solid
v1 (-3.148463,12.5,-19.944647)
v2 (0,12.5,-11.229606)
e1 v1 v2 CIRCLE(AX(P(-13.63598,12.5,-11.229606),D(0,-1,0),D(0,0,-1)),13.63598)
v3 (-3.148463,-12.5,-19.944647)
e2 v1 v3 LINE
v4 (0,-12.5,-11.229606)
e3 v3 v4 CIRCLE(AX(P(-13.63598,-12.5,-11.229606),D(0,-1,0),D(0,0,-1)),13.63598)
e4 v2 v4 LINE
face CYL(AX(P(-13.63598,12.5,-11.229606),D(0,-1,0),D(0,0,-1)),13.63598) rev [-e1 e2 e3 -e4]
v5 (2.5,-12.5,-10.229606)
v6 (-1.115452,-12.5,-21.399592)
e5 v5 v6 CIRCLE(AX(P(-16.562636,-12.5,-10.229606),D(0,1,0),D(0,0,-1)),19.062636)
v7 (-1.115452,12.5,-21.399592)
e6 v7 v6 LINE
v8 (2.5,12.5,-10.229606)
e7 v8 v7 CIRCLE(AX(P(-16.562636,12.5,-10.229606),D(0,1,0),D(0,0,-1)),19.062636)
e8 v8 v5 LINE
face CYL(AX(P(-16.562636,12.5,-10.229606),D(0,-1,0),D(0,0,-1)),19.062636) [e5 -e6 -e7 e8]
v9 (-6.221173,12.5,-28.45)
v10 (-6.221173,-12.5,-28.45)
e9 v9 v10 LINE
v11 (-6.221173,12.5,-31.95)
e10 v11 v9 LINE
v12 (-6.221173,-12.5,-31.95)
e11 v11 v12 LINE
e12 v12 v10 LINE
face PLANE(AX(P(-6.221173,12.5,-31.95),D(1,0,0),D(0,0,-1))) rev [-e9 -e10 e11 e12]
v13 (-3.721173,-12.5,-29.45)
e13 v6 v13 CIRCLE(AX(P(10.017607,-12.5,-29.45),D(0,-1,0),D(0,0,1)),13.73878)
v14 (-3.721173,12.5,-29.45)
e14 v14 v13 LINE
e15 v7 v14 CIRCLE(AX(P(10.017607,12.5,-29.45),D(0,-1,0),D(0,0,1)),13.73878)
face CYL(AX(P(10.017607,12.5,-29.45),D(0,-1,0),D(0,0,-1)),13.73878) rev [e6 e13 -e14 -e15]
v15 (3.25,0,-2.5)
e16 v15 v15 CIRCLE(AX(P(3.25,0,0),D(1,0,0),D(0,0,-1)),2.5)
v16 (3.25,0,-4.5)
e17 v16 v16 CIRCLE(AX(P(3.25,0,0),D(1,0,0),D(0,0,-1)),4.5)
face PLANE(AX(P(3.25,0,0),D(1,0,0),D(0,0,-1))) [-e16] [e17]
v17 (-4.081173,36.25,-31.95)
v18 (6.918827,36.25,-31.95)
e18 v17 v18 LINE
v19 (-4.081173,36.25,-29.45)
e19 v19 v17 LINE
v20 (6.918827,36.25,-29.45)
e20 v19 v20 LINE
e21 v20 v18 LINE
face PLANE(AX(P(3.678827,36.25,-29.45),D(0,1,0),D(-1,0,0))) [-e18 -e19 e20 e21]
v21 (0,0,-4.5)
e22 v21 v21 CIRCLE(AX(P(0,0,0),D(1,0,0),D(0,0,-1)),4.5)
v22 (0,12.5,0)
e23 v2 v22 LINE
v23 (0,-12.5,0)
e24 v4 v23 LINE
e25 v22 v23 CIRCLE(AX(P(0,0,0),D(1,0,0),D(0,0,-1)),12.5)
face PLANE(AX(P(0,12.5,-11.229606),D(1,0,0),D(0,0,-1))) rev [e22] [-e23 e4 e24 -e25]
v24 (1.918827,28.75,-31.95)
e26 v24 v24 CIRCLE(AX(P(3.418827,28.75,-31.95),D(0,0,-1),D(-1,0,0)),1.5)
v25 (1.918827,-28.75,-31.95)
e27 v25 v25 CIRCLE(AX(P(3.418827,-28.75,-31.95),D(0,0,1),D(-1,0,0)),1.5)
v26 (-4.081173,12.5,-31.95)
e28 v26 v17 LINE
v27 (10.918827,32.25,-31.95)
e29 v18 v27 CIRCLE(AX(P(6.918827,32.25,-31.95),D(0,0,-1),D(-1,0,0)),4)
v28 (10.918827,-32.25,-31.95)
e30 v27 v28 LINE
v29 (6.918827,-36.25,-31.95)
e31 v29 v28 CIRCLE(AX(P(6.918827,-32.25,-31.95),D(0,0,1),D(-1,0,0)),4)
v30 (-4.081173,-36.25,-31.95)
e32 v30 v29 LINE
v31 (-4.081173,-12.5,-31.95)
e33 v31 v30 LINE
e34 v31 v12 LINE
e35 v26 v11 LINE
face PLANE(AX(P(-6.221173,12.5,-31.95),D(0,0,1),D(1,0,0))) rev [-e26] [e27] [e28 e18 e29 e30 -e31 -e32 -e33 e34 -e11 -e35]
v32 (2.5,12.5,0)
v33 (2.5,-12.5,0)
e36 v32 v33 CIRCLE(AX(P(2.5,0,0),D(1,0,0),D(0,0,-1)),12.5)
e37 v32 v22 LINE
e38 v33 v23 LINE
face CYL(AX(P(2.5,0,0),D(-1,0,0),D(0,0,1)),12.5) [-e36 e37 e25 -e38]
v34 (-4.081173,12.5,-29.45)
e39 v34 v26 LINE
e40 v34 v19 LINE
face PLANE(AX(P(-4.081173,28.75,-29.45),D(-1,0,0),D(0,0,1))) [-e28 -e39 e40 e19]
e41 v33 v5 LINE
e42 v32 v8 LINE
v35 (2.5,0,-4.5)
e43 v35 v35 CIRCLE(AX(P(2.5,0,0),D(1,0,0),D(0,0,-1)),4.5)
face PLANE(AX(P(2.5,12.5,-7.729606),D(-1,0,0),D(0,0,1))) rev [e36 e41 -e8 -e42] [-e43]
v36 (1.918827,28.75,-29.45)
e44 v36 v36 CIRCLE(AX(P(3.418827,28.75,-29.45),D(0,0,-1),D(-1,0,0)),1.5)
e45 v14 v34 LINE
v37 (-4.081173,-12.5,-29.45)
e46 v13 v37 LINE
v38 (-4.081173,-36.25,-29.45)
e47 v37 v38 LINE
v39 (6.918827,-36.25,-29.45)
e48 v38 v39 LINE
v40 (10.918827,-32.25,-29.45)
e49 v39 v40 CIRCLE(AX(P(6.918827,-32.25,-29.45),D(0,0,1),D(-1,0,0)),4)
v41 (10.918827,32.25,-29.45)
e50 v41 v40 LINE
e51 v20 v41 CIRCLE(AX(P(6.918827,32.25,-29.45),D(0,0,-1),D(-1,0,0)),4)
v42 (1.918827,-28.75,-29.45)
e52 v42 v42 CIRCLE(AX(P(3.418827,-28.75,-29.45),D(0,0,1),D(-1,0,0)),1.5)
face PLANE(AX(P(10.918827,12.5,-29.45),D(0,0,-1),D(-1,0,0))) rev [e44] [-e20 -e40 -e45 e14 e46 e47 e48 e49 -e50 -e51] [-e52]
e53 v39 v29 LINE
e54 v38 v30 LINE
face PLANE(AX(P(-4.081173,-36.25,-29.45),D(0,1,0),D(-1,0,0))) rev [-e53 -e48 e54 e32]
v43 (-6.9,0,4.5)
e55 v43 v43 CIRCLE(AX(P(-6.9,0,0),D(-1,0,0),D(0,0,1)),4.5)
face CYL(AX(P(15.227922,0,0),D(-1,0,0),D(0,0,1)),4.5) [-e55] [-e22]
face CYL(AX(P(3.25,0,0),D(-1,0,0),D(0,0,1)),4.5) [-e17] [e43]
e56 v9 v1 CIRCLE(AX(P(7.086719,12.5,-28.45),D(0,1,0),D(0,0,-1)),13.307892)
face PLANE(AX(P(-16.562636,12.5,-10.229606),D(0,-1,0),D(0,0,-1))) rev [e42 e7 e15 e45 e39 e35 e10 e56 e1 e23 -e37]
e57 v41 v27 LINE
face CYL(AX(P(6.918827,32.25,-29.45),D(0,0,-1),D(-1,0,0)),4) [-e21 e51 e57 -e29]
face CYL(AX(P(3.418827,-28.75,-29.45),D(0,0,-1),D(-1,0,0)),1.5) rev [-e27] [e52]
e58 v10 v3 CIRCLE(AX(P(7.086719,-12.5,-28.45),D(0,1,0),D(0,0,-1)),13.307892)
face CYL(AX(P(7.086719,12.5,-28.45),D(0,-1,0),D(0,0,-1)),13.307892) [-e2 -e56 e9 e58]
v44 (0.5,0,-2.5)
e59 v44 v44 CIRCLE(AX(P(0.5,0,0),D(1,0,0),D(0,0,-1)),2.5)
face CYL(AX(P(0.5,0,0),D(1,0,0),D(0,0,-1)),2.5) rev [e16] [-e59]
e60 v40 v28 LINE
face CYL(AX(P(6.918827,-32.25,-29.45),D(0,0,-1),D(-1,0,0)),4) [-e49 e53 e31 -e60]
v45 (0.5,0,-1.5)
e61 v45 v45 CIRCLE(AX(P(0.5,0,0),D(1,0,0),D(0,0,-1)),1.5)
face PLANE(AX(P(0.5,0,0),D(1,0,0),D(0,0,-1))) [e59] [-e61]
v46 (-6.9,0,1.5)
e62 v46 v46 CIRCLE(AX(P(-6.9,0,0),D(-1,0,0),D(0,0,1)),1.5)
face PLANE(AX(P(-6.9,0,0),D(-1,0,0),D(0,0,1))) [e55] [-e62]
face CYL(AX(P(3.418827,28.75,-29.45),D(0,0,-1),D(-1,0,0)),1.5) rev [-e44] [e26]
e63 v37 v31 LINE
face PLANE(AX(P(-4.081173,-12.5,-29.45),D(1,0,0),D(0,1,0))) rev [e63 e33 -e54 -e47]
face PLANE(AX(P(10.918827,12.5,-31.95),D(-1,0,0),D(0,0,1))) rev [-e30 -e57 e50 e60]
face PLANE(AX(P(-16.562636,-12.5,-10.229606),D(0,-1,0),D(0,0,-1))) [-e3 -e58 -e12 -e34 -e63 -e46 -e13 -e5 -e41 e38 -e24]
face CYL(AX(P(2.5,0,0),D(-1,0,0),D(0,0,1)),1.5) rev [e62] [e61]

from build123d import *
from build123d.topology import SkipClean

# Parameters (mm, degrees)
SKETCH1_R                = 1.5
BOSS_EXTRUDE1_DEPTH      = 2.5
BOSS_EXTRUDE2_DEPTH      = 6.9
BOSS_EXTRUDE2_DEPTH_BACK = 2.5
SKETCH2_R                = 4.5
SKETCH2_R_2              = 1.5
SKETCH4_R                = 2.5
CUT_EXTRUDE1_DEPTH       = 2
BOSS_EXTRUDE3_START      = 0.75
SKETCH5_R                = 4.5
SKETCH5_R_2              = 2.5
BOSS_EXTRUDE3_DEPTH      = 0.75
BOSS_EXTRUDE4_DEPTH      = 2.5
CUT_EXTRUDE2_REACH       = 80.314
SKETCH7_W                = 7
SKETCH7_H                = 16.5
SKETCH7_W_2              = 16
SKETCH7_H_2              = 8
CUT_EXTRUDE3_REACH       = 82.041
SKETCH9_W                = 2.5
SKETCH9_H                = 22.388822383
BOSS_EXTRUDE5_DEPTH      = 12.5
FILLET2_R                = 1
FILLET3_R                = 4
CUT_EXTRUDE4_DEPTH       = 74.103052287
CUT_EXTRUDE4_DEPTH_BACK  = 74.103052287
SKETCH10_W               = 78.235731334
SKETCH10_H               = 6.290045588
SKETCH11_W               = 14.64
SKETCH11_H               = 2.5
BOSS_EXTRUDE6_DEPTH      = 12.5
BOSS_EXTRUDE7_DEPTH      = 2.5
SKETCH14_R               = 1.5
CUT_EXTRUDE5_DEPTH       = 2.5


with BuildPart() as part:
    # Sketch1 → Boss-Extrude1 (new body)
    with BuildSketch(Plane(origin=(0, 0, 0), x_dir=(0, 0, -1), z_dir=(1, 0, 0))):
        with BuildLine():
            Line((0, 12.5), (34.45, 12.5))
            Line((34.45, 12.5), (34.45, -12.5))
            Line((34.45, -12.5), (0, -12.5))
            ThreePointArc((0, -12.5), (-12.5, 0), (0, 12.5))
        make_face()
        Circle(SKETCH1_R, mode=Mode.SUBTRACT)
    extrude(amount=BOSS_EXTRUDE1_DEPTH)

    # Sketch2 → Boss-Extrude2 (add, two sides: drawn at the far end of the back side and taken through both)
    with BuildSketch(Plane.ZY.offset(-BOSS_EXTRUDE2_DEPTH_BACK)):
        Circle(SKETCH2_R)
        Circle(SKETCH2_R_2, mode=Mode.SUBTRACT)
    extrude(amount=BOSS_EXTRUDE2_DEPTH + BOSS_EXTRUDE2_DEPTH_BACK)

    # Sketch4 → Cut-Extrude1 (cut)
    with BuildSketch(Plane(origin=(2.5, 0, 0), x_dir=(0, 0, -1), z_dir=(1, 0, 0))):
        Circle(SKETCH4_R)
    extrude(amount=-CUT_EXTRUDE1_DEPTH, mode=Mode.SUBTRACT)

    # Sketch5 → Boss-Extrude3 (add)
    with SkipClean():  # the faces are left unmerged after this step: merging them gives an invalid solid
        with BuildSketch(Plane(origin=(2.5, 0, 0), x_dir=(0, 0, -1), z_dir=(1, 0, 0)).offset(BOSS_EXTRUDE3_START)):
            with Locations(Location((0, 0, 0), (0, 0, 180))):
                Circle(SKETCH5_R)
            Circle(SKETCH5_R_2, mode=Mode.SUBTRACT)
        extrude(amount=-BOSS_EXTRUDE3_DEPTH)

    # Sketch6 → Boss-Extrude4 (add)
    with SkipClean():  # the faces are left unmerged after this step: merging them gives an invalid solid
        with BuildSketch(Plane(origin=(0, 0, -34.45), x_dir=(-1, 0, 0), z_dir=(0, 0, -1))):
            Polygon((-8.812505246, 36.25), (53.321583376, 36.25), (53.321583376, -36.25), (6.25, -36.25), (-19.178416624, -36.25), (-19.178416624, 36.25), align=None)
        extrude(amount=-BOSS_EXTRUDE4_DEPTH)
    add(part.part.scale(1), mode=Mode.REPLACE)  # the faces are merged on a copy

    # Sketch7 → Cut-Extrude2 (cut, up to next)
    with BuildSketch(Plane.XY.offset(-31.95), mode=Mode.PRIVATE) as cut_extrude2_sk1:
        with Locations((-1.711858899, -11.632438111)):
            Rectangle(SKETCH7_W, SKETCH7_H)
    cut_extrude2_tool1 = extrude(cut_extrude2_sk1.sketch, amount=-CUT_EXTRUDE2_REACH, mode=Mode.PRIVATE) & part.part
    # Sketch7 → Cut-Extrude2 (cut, up to next)
    with BuildSketch(Plane.XY.offset(-31.95), mode=Mode.PRIVATE) as cut_extrude2_sk2:
        with Locations((-16.5, 0)):
            Rectangle(SKETCH7_W_2, SKETCH7_H_2)
    cut_extrude2_tool2 = extrude(cut_extrude2_sk2.sketch, amount=-CUT_EXTRUDE2_REACH, mode=Mode.PRIVATE) & part.part
    add(cut_extrude2_tool1.solids().sort_by_distance((-1.711859, -11.632438, -31.95))[0], mode=Mode.SUBTRACT)
    add(cut_extrude2_tool2.solids().sort_by_distance((-16.5, 0, -31.95))[0], mode=Mode.SUBTRACT)

    # Sketch9 → Cut-Extrude3 (cut, up to next)
    with BuildSketch(Plane.XZ.offset(12.5), mode=Mode.PRIVATE) as cut_extrude3_sk1:
        with Locations((1.25, -20.755588809)):
            Rectangle(SKETCH9_W, SKETCH9_H)
    cut_extrude3_tool1 = extrude(cut_extrude3_sk1.sketch, amount=-CUT_EXTRUDE3_REACH, mode=Mode.PRIVATE) & part.part
    add(cut_extrude3_tool1.solids().sort_by_distance((1.25, -12.5, -20.755589))[0], mode=Mode.SUBTRACT)


with BuildPart() as cut_extrude3_piece_1:
    # of the separate pieces the step leaves, piece 1, a body of its own (cut_extrude3_pieces)
    add(part.part.solids().sort_by_distance((-53.321583376, 36.25, -31.95))[0])



with BuildPart() as cut_extrude3_piece_2:
    # of the separate pieces the step leaves, piece 2, a body of its own (cut_extrude3_pieces)
    add(part.part.solids().sort_by_distance((0, 12.5, 0))[0])


with BuildPart() as cut_extrude3_piece_1_1:
    add(cut_extrude3_piece_1.part)

    add(cut_extrude3_piece_2.part)  # Boss-Extrude5 merges Cut-Extrude3 piece 2
    # Sketch8 → Boss-Extrude5 (add, symmetric)
    with BuildSketch(Plane(origin=(0, 0, 0), x_dir=(1, 0, 0), z_dir=(0, 1, 0))):
        with BuildLine():
            Line((0, 7.729605828), (2.5, 7.729605828))
            Line((2.5, 7.729605828), (2.5, 10.229605828))
            ThreePointArc((2.5, 10.229605828), (1.573627862, 16.099871922), (-1.115452176, 21.399592472))
            ThreePointArc((-1.115452176, 21.399592472), (-3.053519862, 25.219195088), (-3.721172696, 29.45))
            Line((-3.721172696, 29.45), (-3.721172696, 31.95))
            Line((-3.721172696, 31.95), (-6.221172696, 31.95))
            Line((-6.221172696, 31.95), (-6.221172696, 28.45))
            ThreePointArc((-6.221172696, 28.45), (-5.429444077, 23.92831405), (-3.148463103, 19.944646916))
            ThreePointArc((-3.148463103, 19.944646916), (-0.81124762, 15.862767844), (0, 11.229605828))
            Line((0, 11.229605828), (0, 7.729605828))
        make_face()
    extrude(amount=BOSS_EXTRUDE5_DEPTH, both=True)

    # Fillet2
    fillet2_edges = [cut_extrude3_piece_1_1.edges().sort_by_distance(p)[0] for p in [
        (-8.5, 4, -33.2),
        (-8.5, -4, -33.2),
        (-24.5, -4, -33.2),
        (-24.5, 4, -33.2),
        (-5.211858899, -19.882438111, -33.2),
        (-5.211858899, -3.382438111, -33.2),
        (1.788141101, -3.382438111, -33.2),
        (1.788141101, -19.882438111, -33.2),
    ]]
    fillet(fillet2_edges, radius=FILLET2_R)

    # Fillet3
    fillet3_edges = [cut_extrude3_piece_1_1.edges().sort_by_distance(p)[0] for p in [
        (19.178416624, 36.25, -33.2),
        (-53.321583376, 36.25, -33.2),
        (-53.321583376, -36.25, -33.2),
        (19.178416624, -36.25, -33.2),
    ]]
    fillet(fillet3_edges, radius=FILLET3_R)

    # Sketch10 → Cut-Extrude4 (cut, two sides: drawn at the far end of the back side and taken through both)
    with SkipClean():  # the faces are left unmerged after this step: merging them gives an invalid solid
        with BuildSketch(Plane(origin=(0, 0, 0), x_dir=(1, 0, 0), z_dir=(0, 1, 0)).offset(-CUT_EXTRUDE4_DEPTH_BACK)):
            with Locations((-17.391929865, 35.095022794)):
                Rectangle(SKETCH10_W, SKETCH10_H)
        extrude(amount=CUT_EXTRUDE4_DEPTH + CUT_EXTRUDE4_DEPTH_BACK, mode=Mode.SUBTRACT)

    # Sketch11 → Boss-Extrude6 (add, symmetric)
    with BuildSketch(Plane(origin=(0, 0, 0), x_dir=(1, 0, 0), z_dir=(0, 1, 0))):
        with Locations((3.598827304, 30.7)):
            Rectangle(SKETCH11_W, SKETCH11_H)
    boss_extrude6 = extrude(amount=BOSS_EXTRUDE6_DEPTH, both=True)

    # Sketch13 → Boss-Extrude7 (add)
    with BuildSketch(Plane(origin=(0, 0, -31.95), x_dir=(-1, 0, 0), z_dir=(0, 0, -1))):
        with BuildLine():
            Line((-10.918827304, 12.5), (4.081172696, 12.5))
            Line((4.081172696, 12.5), (4.081172696, 28.75))
            Line((4.081172696, 28.75), (4.081172696, 36.25))
            Line((4.081172696, 36.25), (-3.678827304, 36.25))
            Line((-3.678827304, 36.25), (-6.918827304, 36.25))
            ThreePointArc((-6.918827304, 36.25), (-9.747254429, 35.078427125), (-10.918827304, 32.25))
            Line((-10.918827304, 32.25), (-10.918827304, 28.75))
            Line((-10.918827304, 28.75), (-10.918827304, 12.5))
        make_face()
    boss_extrude7 = extrude(amount=-BOSS_EXTRUDE7_DEPTH)

    # Mirror1: Boss-Extrude6, Boss-Extrude7 across plane
    add(boss_extrude6.mirror(Plane.ZX))
    add(boss_extrude7.mirror(Plane.ZX))

    # Sketch14 → Cut-Extrude5 (cut)
    with BuildSketch(Plane(origin=(0, 0, -31.95), x_dir=(-1, 0, 0), z_dir=(0, 0, -1))):
        with Locations((-3.418827304, 28.75)):
            Circle(SKETCH14_R)
    cut_extrude5 = extrude(amount=-CUT_EXTRUDE5_DEPTH, mode=Mode.SUBTRACT)

    # Mirror2: Cut-Extrude5 across plane
    add(cut_extrude5.mirror(Plane.ZX), mode=Mode.SUBTRACT)


solid = cut_extrude3_piece_1_1.part
